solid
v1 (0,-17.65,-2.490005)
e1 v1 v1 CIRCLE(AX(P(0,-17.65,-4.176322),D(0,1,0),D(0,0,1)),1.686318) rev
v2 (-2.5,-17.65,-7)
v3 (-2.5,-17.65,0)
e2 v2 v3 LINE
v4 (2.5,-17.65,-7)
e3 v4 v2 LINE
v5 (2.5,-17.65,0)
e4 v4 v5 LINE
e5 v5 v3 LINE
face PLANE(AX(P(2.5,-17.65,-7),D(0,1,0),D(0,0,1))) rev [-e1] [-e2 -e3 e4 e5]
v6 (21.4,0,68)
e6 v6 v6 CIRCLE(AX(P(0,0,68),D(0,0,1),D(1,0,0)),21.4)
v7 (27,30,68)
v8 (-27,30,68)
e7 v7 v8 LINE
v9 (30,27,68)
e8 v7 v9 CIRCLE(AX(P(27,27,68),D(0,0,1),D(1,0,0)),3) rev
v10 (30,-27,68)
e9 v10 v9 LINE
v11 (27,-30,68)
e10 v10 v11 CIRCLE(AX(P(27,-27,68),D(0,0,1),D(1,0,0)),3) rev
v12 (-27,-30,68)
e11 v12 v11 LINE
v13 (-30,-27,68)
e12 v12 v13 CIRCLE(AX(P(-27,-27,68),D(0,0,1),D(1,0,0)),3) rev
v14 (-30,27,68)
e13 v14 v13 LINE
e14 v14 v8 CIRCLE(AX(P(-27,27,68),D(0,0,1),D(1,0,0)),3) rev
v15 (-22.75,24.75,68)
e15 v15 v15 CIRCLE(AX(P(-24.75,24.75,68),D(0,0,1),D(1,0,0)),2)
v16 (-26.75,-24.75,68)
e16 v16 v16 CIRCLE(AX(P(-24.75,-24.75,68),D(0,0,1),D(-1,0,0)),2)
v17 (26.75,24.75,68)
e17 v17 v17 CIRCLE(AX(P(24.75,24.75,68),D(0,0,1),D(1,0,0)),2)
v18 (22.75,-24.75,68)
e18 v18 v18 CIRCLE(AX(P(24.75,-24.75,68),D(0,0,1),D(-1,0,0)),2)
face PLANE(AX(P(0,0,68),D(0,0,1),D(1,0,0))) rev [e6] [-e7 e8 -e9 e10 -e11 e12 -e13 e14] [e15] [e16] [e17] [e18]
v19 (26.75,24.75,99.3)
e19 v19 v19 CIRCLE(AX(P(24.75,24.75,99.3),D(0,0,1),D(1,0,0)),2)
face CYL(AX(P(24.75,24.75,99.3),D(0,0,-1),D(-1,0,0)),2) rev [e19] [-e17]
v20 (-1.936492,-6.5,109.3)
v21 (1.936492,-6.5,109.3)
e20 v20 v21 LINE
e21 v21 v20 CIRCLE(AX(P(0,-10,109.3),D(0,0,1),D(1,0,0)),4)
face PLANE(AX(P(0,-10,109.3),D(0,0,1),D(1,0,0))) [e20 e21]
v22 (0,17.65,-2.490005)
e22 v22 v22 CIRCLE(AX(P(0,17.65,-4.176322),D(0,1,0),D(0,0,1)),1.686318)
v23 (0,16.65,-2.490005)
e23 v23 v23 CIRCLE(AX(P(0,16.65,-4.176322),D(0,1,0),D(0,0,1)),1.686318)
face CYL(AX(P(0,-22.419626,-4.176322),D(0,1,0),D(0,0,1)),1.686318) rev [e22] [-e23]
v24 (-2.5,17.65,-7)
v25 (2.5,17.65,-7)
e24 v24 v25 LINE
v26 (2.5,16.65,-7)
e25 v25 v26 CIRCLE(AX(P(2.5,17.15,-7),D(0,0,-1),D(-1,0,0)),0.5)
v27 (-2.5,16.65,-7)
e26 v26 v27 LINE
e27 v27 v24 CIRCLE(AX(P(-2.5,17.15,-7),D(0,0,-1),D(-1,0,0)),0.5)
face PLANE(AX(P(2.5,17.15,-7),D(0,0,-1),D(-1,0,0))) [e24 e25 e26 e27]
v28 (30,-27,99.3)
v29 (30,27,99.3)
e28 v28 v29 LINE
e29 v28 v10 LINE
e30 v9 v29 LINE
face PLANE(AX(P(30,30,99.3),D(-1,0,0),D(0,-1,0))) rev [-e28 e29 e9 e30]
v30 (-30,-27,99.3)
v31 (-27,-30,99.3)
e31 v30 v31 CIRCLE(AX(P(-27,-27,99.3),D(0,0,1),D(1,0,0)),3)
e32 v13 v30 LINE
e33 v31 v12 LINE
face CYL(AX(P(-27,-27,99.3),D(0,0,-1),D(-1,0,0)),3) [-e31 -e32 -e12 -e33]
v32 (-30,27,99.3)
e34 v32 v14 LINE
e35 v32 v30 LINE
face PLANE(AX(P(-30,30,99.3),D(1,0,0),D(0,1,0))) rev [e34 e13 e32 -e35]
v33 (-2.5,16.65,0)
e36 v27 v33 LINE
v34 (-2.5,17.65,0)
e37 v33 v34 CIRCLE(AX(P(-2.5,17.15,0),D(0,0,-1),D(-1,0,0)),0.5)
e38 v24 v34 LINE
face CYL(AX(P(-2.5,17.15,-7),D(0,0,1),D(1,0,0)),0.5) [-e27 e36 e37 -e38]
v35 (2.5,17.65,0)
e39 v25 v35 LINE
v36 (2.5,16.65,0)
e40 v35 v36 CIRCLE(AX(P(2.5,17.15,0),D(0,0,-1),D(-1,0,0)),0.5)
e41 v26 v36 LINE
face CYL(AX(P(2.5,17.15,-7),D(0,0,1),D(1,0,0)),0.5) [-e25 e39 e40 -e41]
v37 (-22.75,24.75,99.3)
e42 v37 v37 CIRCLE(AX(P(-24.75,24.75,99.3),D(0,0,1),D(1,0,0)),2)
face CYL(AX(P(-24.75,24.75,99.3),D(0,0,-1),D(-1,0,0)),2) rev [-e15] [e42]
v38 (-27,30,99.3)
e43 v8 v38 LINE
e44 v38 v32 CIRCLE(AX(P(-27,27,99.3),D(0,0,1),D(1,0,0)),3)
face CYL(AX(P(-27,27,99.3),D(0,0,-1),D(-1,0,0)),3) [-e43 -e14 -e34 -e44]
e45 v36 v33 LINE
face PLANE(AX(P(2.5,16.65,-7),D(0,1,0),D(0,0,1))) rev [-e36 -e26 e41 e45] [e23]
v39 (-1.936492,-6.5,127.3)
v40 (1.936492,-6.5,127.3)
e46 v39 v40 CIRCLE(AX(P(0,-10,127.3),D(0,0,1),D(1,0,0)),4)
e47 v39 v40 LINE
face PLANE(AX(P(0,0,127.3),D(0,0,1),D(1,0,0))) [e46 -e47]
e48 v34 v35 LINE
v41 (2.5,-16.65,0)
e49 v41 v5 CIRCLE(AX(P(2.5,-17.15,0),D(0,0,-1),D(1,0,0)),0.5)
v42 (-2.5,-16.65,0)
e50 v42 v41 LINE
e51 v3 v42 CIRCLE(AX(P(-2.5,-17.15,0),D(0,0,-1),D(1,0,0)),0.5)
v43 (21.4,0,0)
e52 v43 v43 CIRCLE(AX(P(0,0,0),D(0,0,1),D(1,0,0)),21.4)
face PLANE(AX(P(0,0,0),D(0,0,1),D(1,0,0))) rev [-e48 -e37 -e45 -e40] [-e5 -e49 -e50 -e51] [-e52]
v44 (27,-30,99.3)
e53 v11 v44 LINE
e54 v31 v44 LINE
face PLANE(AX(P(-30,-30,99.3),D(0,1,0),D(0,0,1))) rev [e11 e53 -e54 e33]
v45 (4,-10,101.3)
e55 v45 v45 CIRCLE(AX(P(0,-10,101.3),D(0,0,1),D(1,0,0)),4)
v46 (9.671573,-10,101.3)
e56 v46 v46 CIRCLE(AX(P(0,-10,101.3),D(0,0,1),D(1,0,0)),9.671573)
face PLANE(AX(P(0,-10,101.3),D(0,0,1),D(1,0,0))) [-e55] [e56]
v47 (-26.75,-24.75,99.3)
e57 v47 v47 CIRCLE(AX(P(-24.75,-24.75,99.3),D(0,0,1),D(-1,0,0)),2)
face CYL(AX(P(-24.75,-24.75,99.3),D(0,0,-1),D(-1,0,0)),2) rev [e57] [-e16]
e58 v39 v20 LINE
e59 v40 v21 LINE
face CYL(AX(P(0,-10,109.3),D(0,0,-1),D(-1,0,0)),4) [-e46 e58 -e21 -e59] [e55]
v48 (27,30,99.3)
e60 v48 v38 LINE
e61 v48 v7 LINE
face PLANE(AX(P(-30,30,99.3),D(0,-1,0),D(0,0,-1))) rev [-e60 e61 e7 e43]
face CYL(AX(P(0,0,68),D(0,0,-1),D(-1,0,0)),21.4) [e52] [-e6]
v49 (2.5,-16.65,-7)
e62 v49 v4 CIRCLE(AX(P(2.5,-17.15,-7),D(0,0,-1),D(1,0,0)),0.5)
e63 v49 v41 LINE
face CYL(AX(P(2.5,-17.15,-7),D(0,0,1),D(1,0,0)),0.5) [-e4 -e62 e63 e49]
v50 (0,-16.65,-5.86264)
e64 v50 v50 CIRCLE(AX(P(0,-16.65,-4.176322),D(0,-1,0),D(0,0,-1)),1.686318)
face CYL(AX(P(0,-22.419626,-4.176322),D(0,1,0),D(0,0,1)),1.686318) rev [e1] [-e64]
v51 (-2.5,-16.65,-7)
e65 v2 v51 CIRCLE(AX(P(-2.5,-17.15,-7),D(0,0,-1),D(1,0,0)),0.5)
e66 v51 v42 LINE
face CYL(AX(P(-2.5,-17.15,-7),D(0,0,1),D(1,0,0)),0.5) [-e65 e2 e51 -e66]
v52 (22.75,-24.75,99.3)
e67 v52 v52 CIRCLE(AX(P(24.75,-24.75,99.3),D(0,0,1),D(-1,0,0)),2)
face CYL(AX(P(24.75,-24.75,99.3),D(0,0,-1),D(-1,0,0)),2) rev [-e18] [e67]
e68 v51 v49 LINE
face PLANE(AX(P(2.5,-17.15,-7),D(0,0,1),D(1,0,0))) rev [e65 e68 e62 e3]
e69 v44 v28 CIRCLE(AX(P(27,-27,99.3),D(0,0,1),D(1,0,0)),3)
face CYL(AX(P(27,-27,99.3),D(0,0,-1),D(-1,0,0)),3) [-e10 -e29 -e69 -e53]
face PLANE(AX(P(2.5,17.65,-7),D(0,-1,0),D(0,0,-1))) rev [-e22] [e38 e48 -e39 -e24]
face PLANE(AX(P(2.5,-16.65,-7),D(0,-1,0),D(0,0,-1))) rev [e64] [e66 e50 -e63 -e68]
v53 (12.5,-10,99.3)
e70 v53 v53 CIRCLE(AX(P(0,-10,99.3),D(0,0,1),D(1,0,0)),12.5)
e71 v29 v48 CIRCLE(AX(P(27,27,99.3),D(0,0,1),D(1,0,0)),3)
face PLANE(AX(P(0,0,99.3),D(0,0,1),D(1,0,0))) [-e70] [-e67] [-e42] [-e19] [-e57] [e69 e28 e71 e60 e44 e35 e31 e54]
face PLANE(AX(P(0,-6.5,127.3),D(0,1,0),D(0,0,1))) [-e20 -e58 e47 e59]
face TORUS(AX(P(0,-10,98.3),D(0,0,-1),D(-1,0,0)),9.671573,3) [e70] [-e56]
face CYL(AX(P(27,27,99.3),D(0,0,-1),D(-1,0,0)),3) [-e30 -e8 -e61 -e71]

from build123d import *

# Parameters (mm, degrees)
SKETCH1_R           = 21.4
BOSS_EXTRUDE1_DEPTH = 68
SKETCH2_W           = 60
SKETCH2_H           = 60
SKETCH2_R           = 2
BOSS_EXTRUDE2_DEPTH = 31.3
SKETCH3_R           = 12.5
BOSS_EXTRUDE3_DEPTH = 2
FILLET1_R           = 3
SKETCH4_R           = 4
BOSS_EXTRUDE4_DEPTH = 8
BOSS_EXTRUDE5_DEPTH = 18
FILLET2_R           = 3
BOSS_EXTRUDE6_DEPTH = 7
CUT_EXTRUDE1_REACH  = 141.197
SKETCH7_R           = 1.686317599


with BuildPart() as part:
    # Sketch1 → Boss-Extrude1 (new body)
    with BuildSketch(Plane.XY):
        Circle(SKETCH1_R)
    extrude(amount=BOSS_EXTRUDE1_DEPTH)

    # Sketch2 → Boss-Extrude2 (add)
    with BuildSketch(Plane.XY.offset(68)):
        Rectangle(SKETCH2_W, SKETCH2_H)
        with Locations((-24.75, 24.75)):
            Circle(SKETCH2_R, mode=Mode.SUBTRACT)
        with Locations((24.75, 24.75)):
            Circle(SKETCH2_R, mode=Mode.SUBTRACT)
        with Locations(Location((24.75, -24.75, 0), (0, 0, 180))):
            Circle(SKETCH2_R, mode=Mode.SUBTRACT)
        with Locations(Location((-24.75, -24.75, 0), (0, 0, 180))):
            Circle(SKETCH2_R, mode=Mode.SUBTRACT)
    extrude(amount=BOSS_EXTRUDE2_DEPTH)

    # Sketch3 → Boss-Extrude3 (add)
    with BuildSketch(Plane.XY.offset(99.3)):
        with Locations((0, -10)):
            Circle(SKETCH3_R)
    extrude(amount=BOSS_EXTRUDE3_DEPTH)

    # Fillet1
    # the kernel refuses this fillet: 3 mm, written as the material it takes off along each edge
    with BuildSketch(Plane(origin=(0, -10, 101.3), x_dir=(1, 0, 0), z_dir=(0, -1, 0))) as fillet1_piece_1:
        with BuildLine():
            CenterArc((9.671572875, -3), FILLET1_R, 19.471220634, 70.528779366)
            Line((9.671572875, 0), (9.671572875, 0.06))
            Line((9.671572875, 0.06), (12.5, 0.06))
            Line((12.5, 0.06), (12.56, 0))
            ThreePointArc((12.56, 0), (12.56, -1), (12.556568542, -1.98))
            Line((12.556568542, -1.98), (12.5, -2))
        make_face()
    revolve(axis=Axis((0, -10, 101.3), (0, 0, 1)), mode=Mode.SUBTRACT)

    # Sketch4 → Boss-Extrude4 (add)
    with BuildSketch(Plane.XY.offset(101.3)):
        with Locations((0, -10)):
            Circle(SKETCH4_R)
    extrude(amount=BOSS_EXTRUDE4_DEPTH)

    # Sketch5 → Boss-Extrude5 (add)
    with BuildSketch(Plane.XY.offset(109.3)):
        with BuildLine():
            Line((1.936491673, -6.5), (-1.936491673, -6.5))
            ThreePointArc((-1.936491673, -6.5), (-2.031506006, -13.445719569), (4, -10))
            ThreePointArc((4, -10), (3.445719569, -7.968493994), (1.936491673, -6.5))
        make_face()
    extrude(amount=BOSS_EXTRUDE5_DEPTH)

    # Fillet2
    fillet2_edges = [part.edges().sort_by_distance(p)[0] for p in [
        (-30, -30, 83.65),
        (30, -30, 83.65),
        (30, 30, 83.65),
        (-30, 30, 83.65),
    ]]
    fillet(fillet2_edges, radius=FILLET2_R)

    # Sketch6 → Boss-Extrude6 (add)
    with BuildSketch(Plane(origin=(0, 0, 0), x_dir=(-1, 0, 0), z_dir=(0, 0, -1))):
        with BuildLine():
            Line((-2.5, 17.65), (2.5, 17.65))
            ThreePointArc((2.5, 17.65), (3, 17.15), (2.5, 16.65))
            Line((2.5, 16.65), (-2.5, 16.65))
            ThreePointArc((-2.5, 16.65), (-3, 17.15), (-2.5, 17.65))
        make_face()
        with BuildLine():
            Line((-2.5, -17.65), (2.5, -17.65))
            ThreePointArc((2.5, -17.65), (3, -17.15), (2.5, -16.65))
            Line((2.5, -16.65), (-2.5, -16.65))
            ThreePointArc((-2.5, -16.65), (-3, -17.15), (-2.5, -17.65))
        make_face()
    extrude(amount=BOSS_EXTRUDE6_DEPTH)

    # Cut-Extrude1: up to this face of the body (flat: up to its plane)
    cut_extrude1_end = Plane(part.part.faces().sort_by_distance((0, -17.65, -3.5))[0])
    # Sketch7 → Cut-Extrude1 (cut, up to the picked face)
    with BuildSketch(Plane(origin=(0, 17.65, 0), x_dir=(1, 0, 0), z_dir=(0, 1, 0)), mode=Mode.PRIVATE) as cut_extrude1_sk1:
        with Locations(Location((0, 4.176322203, 0), (0, 0, 270))):
            Circle(SKETCH7_R)
    cut_extrude1_tool1 = split(extrude(cut_extrude1_sk1.sketch, amount=-CUT_EXTRUDE1_REACH, mode=Mode.PRIVATE), bisect_by=cut_extrude1_end, keep=Keep.BOTH, mode=Mode.PRIVATE)
    add(cut_extrude1_tool1.solids().sort_by(Axis((0, 17.65, -4.176322), (0, -1, 0)))[0], mode=Mode.SUBTRACT)


solid = part.part
